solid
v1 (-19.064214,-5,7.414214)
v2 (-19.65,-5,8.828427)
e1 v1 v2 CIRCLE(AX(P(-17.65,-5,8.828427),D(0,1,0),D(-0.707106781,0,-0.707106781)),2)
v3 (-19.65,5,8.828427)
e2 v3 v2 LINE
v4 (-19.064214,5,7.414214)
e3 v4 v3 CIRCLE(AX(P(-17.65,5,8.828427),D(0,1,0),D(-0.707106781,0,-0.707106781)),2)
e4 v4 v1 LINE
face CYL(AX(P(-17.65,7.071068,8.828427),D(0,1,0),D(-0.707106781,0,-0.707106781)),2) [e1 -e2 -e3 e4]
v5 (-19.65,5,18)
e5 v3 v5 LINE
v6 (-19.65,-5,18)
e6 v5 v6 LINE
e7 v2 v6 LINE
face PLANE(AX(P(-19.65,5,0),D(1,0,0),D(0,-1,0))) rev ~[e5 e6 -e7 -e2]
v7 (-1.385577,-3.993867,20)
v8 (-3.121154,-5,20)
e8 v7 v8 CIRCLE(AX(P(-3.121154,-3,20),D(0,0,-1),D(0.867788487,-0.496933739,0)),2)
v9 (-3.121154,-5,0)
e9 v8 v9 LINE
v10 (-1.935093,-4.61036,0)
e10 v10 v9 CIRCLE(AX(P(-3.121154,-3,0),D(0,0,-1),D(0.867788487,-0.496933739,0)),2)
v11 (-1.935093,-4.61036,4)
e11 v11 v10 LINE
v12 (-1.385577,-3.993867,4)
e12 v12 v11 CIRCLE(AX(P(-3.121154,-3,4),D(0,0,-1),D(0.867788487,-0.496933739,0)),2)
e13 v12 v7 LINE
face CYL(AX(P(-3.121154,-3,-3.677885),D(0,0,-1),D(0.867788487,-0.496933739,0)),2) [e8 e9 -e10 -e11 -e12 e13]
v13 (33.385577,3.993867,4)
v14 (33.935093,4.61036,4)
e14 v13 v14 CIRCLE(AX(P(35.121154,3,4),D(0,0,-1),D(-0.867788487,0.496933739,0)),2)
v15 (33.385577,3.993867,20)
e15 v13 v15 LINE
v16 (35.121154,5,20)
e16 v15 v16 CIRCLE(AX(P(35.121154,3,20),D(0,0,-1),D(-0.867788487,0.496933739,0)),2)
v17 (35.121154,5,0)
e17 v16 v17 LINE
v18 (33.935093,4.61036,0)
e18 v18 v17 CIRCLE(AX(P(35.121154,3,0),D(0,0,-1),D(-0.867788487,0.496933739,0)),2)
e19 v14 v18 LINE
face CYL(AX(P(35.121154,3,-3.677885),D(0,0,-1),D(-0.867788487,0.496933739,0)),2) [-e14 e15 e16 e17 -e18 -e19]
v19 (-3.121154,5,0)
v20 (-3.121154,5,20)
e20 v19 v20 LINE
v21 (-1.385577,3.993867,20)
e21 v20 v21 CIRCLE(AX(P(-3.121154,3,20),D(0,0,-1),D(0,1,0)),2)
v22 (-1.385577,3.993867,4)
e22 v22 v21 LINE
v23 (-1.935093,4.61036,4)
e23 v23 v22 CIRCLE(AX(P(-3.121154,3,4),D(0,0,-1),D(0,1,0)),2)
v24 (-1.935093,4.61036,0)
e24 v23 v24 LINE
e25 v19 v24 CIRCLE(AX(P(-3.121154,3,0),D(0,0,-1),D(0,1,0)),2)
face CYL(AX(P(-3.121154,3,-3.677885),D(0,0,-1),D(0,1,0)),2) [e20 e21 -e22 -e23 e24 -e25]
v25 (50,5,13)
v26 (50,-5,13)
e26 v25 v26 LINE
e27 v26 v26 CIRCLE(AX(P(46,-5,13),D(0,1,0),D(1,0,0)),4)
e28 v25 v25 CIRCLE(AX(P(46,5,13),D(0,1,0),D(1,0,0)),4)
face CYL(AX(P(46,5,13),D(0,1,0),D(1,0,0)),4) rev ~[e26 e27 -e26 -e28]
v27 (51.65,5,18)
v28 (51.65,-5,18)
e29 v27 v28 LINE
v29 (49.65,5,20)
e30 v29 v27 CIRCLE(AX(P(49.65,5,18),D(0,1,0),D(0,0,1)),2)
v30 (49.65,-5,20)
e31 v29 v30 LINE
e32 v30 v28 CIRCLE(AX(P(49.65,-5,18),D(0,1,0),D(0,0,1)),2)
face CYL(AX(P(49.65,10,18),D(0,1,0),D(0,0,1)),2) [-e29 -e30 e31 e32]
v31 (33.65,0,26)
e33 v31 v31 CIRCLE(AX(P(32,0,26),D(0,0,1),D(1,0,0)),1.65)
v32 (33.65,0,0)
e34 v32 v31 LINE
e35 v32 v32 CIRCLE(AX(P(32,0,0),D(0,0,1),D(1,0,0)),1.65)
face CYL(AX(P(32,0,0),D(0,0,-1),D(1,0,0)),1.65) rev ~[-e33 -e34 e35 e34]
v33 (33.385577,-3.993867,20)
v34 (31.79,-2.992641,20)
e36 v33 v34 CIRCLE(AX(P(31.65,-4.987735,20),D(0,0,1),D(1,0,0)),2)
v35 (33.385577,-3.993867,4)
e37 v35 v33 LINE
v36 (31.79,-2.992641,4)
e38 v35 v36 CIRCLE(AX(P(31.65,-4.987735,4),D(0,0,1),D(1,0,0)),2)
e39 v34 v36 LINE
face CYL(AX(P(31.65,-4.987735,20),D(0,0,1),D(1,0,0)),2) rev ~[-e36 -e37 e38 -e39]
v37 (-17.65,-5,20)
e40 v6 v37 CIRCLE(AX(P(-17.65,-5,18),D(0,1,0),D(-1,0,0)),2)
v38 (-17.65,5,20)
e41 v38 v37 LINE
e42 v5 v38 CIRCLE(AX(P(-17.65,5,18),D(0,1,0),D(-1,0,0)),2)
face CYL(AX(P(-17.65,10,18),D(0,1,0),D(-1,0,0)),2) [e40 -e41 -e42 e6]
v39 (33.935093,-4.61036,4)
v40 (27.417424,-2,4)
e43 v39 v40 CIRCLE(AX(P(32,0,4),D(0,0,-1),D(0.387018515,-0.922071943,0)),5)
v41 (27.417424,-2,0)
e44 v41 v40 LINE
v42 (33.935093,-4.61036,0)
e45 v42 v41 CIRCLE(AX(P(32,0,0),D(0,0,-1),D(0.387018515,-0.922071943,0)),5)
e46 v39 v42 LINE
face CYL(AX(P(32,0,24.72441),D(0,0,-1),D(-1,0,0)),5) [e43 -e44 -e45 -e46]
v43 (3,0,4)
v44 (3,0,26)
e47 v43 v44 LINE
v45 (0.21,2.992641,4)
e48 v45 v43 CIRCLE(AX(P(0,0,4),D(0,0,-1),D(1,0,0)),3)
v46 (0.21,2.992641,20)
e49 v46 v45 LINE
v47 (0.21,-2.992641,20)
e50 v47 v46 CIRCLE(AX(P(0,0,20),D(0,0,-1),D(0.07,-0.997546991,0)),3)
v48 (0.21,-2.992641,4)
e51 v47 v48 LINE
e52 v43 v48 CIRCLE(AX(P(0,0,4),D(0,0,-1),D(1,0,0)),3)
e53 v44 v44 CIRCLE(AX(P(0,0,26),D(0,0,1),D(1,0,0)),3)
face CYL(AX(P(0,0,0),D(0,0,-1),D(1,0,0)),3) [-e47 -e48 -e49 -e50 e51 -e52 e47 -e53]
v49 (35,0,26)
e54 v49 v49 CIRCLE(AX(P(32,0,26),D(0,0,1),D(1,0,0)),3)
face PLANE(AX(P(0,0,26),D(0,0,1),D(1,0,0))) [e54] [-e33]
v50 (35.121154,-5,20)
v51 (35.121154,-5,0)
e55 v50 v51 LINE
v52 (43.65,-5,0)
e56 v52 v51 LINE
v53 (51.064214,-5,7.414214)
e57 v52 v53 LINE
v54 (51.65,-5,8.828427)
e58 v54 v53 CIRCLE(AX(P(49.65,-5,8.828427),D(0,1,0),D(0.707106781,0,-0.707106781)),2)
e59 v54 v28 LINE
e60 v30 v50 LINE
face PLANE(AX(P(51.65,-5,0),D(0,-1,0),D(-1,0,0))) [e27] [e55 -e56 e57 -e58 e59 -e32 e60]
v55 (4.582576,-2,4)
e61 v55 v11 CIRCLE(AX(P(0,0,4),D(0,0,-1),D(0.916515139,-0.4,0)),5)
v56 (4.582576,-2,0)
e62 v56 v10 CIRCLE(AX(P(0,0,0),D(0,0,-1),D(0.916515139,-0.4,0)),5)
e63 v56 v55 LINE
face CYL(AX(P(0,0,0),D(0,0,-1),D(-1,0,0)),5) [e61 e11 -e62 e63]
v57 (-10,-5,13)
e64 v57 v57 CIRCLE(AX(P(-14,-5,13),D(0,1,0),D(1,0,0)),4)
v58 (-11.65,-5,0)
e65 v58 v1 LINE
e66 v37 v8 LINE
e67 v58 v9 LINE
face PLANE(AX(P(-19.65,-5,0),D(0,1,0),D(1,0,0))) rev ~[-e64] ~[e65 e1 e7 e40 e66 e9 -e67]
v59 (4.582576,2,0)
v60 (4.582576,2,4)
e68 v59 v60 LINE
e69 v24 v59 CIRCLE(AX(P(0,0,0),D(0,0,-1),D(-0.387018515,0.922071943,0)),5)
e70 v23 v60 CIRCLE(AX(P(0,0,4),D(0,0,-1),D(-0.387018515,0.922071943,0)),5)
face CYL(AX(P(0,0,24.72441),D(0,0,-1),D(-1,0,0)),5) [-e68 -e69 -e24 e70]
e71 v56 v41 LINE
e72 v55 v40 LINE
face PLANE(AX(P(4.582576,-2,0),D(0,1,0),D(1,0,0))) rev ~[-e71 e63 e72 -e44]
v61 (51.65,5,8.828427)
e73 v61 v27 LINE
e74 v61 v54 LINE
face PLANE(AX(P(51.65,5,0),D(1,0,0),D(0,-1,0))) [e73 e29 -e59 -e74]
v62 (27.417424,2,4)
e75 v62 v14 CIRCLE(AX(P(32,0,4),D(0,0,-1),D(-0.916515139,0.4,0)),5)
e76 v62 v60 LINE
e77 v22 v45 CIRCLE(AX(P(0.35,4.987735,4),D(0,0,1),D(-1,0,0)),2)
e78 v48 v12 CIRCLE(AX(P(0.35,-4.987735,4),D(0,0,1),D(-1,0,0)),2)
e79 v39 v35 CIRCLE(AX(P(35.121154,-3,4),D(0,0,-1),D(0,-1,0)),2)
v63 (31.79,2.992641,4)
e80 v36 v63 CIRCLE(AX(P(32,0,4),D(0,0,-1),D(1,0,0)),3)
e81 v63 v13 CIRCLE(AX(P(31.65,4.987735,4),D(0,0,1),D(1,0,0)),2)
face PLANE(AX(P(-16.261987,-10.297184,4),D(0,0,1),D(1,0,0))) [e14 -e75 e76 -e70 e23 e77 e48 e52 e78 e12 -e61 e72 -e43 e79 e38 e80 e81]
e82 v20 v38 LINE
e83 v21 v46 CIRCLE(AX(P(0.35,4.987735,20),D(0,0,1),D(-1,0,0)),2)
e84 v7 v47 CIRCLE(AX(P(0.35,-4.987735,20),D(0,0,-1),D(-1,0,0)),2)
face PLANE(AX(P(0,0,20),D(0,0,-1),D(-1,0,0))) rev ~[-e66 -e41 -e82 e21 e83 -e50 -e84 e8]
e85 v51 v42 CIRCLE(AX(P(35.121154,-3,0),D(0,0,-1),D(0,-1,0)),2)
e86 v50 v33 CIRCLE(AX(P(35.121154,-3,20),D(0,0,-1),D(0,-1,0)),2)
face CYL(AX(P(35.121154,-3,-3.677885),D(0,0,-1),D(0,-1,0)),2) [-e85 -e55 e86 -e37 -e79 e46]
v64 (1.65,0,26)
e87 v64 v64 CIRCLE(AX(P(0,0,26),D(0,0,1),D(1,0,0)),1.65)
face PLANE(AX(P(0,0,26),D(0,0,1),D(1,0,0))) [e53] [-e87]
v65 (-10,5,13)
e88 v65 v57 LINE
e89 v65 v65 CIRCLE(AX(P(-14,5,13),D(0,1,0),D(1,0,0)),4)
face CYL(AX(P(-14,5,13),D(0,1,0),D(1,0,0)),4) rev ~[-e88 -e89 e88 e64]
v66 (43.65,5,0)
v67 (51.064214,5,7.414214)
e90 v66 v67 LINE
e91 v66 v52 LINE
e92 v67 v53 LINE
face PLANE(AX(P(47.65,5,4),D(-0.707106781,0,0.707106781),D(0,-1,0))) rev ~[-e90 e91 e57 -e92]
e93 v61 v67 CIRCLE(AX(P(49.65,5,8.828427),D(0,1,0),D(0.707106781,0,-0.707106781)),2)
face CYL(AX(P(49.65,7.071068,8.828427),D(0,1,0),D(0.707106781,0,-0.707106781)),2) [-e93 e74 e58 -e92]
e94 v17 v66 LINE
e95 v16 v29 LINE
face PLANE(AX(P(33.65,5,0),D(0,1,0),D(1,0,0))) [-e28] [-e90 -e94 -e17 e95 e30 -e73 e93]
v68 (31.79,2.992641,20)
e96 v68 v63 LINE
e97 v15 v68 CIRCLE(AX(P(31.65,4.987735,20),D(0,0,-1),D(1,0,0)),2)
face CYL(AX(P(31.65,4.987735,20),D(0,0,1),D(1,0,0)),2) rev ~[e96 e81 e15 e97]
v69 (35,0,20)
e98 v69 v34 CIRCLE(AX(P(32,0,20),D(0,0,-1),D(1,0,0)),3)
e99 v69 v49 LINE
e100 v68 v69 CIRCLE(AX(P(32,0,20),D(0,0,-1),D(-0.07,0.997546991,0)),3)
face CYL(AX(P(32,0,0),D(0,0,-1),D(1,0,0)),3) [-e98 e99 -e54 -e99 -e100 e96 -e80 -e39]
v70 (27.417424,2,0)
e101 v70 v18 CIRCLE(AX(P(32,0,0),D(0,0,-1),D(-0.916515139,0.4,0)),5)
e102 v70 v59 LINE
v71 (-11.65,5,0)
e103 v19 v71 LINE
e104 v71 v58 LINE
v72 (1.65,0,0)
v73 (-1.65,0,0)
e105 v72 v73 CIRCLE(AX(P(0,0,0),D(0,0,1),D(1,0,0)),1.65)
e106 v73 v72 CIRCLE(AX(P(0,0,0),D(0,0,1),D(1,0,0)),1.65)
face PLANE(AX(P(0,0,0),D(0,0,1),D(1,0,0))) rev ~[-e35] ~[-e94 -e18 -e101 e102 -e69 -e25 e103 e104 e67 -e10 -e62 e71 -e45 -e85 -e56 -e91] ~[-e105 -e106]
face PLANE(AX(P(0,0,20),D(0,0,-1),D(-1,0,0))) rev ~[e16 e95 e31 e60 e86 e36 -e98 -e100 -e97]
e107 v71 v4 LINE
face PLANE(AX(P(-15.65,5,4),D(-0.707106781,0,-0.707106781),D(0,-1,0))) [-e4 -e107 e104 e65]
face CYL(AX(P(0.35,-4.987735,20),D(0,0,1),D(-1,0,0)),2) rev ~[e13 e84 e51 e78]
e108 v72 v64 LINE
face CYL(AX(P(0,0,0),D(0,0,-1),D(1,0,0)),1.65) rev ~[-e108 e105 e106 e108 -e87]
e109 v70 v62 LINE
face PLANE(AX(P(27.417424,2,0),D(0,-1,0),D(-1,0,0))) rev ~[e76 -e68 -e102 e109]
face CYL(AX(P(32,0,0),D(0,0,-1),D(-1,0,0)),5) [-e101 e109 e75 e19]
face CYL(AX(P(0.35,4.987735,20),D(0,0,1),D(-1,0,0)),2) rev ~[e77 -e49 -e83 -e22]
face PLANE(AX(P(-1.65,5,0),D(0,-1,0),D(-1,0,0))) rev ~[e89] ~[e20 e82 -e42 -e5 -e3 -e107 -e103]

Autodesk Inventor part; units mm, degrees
ref_plane "YZ Plane" through (0, 0, 0) normal (1, 0, 0) x (0, 1, 0)
ref_plane "XZ Plane" through (0, 0, 0) normal (0, 1, 0) x (-1, 0, 0)
ref_plane "XY Plane" through (0, 0, 0) normal (0, 0, 1) x (1, 0, 0)
sketch "Sketch1" plane through (0, 0, 0) normal (0, 0, 1) x (1, 0, 0)
  circle A0 centre (0, 0) radius 1.65
  circle A1 centre (0, 0) radius 3
  circle A2 centre (32, 0) radius 1.65
  circle A3 centre (32, 0) radius 3
  dimension "d0" = 3.3
  dimension "d1" = 6
  dimension "d22" = 32
extrude "Extrusion1" add sketch "Sketch1" along normal blind 26
sketch "Sketch2" plane through (0, 0, 0) normal (0, 0, -1) x (-1, 0, 0)
  circle A0 centre (0, 0) radius 3 projected
  circle A1 centre (0, 0) radius 5
  circle A2 centre (-32, 0) radius 1.65 projected
  circle A3 centre (-32, 0) radius 5
  circle A4 centre (0, 0) radius 1.65 construction
  line L0 (-30.35, 2) -> (-1.65, 2)
  line L1 (-1.65, 2) -> (-1.65, -2)
  line L2 (-1.65, -2) -> (-30.35, -2)
  line L3 (-30.35, -2) -> (-30.35, 2)
  point P0 (-1.65, 0)
  dimension "d4" = 10
  dimension "d7" = 4
extrude "Extrusion2" add sketch "Sketch2" against normal blind 4 contours A0 L0 A1 L2 | L0 L1 L2 A0 | A0 L2 A1 L0 | A1 L2 A3 L0 | L0 L3 L2 A3 | A3 L2 L3 L0 picked at (-2.1, 0)
sketch "Sketch3" plane through (0, 0, 0) normal (0, 0, -1) x (-1, 0, 0)
  line L0 (-51.65, -5) -> (-33.65, -5)
  line L1 (-33.65, -5) -> (-33.65, 5)
  line L2 (-33.65, 5) -> (-51.65, 5)
  line L3 (-51.65, 5) -> (-51.65, -5)
  line L4 (1.65, 5) -> (19.65, 5)
  line L5 (19.65, 5) -> (19.65, -5)
  line L6 (19.65, -5) -> (1.65, -5)
  line L7 (1.65, -5) -> (1.65, 5)
  circle A0 centre (0, 0) radius 1.65 construction
  circle A1 centre (-32, 0) radius 1.65 construction
  arc A2 (-27.4174, 2) -> (-27.4174, -2) centre (-32, 0) ccw construction
  arc A3 (-4.5826, -2) -> (-4.5826, 2) centre (0, 0) ccw construction
  point P0 (-33.65, 0)
  point P1 (1.65, 0)
  dimension "d8" = 18
  dimension "d10" = 18
extrude "Extrusion3" add sketch "Sketch3" against normal blind 20
sketch "Sketch4" plane through (33.65, 5, 0) normal (0, 1, 0) x (1, 0, 0)
  circle A0 centre (-47.65, -13) radius 4
  circle A1 centre (12.35, -13) radius 4
  line L0 (-35.3, -20) -> (-53.3, -20) projected
  line L1 (18, -20) -> (0, -20) projected
  line L2 (-35.3, 0) -> (-53.3, 0) projected
  line L3 (18, 0) -> (18, -20) projected
  line L4 (-53.3, 0) -> (-53.3, -20) projected
  point P0 (-33.65, 0)
  point P1 (-44.3, -20)
  point P2 (9, -20)
  dimension "d13" = 8
  dimension "d14" = 8
  dimension "d15" = 13
  dimension "d23" = 60
  dimension "d24" = 5.65
  dimension "d25" = 5.65
extrude "Extrusion4" cut sketch "Sketch4" against normal blind 20
chamfer "Chamfer1" distance 8 angle 45 2 edges at (51.65, 0, 0) (-19.65, 0, 0)
fillet "Fillet1" radius 2 12 edges at (33.65, 2.5055, 12) (33.65, -2.5055, 12) (33.65, 5, 10) (-1.65, 2.5055, 12) (-1.65, -2.5055, 12) (-1.65, 5, 10) (-1.65, -5, 10) (33.65, -5, 10) (51.65, 0, 20) (51.65, 0, 8) (-19.65, 0, 8) (-19.65, 0, 20)
equation "\"d10\" = d8"
equation "\"d24\" = d25"
properties part number "spacer stepperM n rail"
